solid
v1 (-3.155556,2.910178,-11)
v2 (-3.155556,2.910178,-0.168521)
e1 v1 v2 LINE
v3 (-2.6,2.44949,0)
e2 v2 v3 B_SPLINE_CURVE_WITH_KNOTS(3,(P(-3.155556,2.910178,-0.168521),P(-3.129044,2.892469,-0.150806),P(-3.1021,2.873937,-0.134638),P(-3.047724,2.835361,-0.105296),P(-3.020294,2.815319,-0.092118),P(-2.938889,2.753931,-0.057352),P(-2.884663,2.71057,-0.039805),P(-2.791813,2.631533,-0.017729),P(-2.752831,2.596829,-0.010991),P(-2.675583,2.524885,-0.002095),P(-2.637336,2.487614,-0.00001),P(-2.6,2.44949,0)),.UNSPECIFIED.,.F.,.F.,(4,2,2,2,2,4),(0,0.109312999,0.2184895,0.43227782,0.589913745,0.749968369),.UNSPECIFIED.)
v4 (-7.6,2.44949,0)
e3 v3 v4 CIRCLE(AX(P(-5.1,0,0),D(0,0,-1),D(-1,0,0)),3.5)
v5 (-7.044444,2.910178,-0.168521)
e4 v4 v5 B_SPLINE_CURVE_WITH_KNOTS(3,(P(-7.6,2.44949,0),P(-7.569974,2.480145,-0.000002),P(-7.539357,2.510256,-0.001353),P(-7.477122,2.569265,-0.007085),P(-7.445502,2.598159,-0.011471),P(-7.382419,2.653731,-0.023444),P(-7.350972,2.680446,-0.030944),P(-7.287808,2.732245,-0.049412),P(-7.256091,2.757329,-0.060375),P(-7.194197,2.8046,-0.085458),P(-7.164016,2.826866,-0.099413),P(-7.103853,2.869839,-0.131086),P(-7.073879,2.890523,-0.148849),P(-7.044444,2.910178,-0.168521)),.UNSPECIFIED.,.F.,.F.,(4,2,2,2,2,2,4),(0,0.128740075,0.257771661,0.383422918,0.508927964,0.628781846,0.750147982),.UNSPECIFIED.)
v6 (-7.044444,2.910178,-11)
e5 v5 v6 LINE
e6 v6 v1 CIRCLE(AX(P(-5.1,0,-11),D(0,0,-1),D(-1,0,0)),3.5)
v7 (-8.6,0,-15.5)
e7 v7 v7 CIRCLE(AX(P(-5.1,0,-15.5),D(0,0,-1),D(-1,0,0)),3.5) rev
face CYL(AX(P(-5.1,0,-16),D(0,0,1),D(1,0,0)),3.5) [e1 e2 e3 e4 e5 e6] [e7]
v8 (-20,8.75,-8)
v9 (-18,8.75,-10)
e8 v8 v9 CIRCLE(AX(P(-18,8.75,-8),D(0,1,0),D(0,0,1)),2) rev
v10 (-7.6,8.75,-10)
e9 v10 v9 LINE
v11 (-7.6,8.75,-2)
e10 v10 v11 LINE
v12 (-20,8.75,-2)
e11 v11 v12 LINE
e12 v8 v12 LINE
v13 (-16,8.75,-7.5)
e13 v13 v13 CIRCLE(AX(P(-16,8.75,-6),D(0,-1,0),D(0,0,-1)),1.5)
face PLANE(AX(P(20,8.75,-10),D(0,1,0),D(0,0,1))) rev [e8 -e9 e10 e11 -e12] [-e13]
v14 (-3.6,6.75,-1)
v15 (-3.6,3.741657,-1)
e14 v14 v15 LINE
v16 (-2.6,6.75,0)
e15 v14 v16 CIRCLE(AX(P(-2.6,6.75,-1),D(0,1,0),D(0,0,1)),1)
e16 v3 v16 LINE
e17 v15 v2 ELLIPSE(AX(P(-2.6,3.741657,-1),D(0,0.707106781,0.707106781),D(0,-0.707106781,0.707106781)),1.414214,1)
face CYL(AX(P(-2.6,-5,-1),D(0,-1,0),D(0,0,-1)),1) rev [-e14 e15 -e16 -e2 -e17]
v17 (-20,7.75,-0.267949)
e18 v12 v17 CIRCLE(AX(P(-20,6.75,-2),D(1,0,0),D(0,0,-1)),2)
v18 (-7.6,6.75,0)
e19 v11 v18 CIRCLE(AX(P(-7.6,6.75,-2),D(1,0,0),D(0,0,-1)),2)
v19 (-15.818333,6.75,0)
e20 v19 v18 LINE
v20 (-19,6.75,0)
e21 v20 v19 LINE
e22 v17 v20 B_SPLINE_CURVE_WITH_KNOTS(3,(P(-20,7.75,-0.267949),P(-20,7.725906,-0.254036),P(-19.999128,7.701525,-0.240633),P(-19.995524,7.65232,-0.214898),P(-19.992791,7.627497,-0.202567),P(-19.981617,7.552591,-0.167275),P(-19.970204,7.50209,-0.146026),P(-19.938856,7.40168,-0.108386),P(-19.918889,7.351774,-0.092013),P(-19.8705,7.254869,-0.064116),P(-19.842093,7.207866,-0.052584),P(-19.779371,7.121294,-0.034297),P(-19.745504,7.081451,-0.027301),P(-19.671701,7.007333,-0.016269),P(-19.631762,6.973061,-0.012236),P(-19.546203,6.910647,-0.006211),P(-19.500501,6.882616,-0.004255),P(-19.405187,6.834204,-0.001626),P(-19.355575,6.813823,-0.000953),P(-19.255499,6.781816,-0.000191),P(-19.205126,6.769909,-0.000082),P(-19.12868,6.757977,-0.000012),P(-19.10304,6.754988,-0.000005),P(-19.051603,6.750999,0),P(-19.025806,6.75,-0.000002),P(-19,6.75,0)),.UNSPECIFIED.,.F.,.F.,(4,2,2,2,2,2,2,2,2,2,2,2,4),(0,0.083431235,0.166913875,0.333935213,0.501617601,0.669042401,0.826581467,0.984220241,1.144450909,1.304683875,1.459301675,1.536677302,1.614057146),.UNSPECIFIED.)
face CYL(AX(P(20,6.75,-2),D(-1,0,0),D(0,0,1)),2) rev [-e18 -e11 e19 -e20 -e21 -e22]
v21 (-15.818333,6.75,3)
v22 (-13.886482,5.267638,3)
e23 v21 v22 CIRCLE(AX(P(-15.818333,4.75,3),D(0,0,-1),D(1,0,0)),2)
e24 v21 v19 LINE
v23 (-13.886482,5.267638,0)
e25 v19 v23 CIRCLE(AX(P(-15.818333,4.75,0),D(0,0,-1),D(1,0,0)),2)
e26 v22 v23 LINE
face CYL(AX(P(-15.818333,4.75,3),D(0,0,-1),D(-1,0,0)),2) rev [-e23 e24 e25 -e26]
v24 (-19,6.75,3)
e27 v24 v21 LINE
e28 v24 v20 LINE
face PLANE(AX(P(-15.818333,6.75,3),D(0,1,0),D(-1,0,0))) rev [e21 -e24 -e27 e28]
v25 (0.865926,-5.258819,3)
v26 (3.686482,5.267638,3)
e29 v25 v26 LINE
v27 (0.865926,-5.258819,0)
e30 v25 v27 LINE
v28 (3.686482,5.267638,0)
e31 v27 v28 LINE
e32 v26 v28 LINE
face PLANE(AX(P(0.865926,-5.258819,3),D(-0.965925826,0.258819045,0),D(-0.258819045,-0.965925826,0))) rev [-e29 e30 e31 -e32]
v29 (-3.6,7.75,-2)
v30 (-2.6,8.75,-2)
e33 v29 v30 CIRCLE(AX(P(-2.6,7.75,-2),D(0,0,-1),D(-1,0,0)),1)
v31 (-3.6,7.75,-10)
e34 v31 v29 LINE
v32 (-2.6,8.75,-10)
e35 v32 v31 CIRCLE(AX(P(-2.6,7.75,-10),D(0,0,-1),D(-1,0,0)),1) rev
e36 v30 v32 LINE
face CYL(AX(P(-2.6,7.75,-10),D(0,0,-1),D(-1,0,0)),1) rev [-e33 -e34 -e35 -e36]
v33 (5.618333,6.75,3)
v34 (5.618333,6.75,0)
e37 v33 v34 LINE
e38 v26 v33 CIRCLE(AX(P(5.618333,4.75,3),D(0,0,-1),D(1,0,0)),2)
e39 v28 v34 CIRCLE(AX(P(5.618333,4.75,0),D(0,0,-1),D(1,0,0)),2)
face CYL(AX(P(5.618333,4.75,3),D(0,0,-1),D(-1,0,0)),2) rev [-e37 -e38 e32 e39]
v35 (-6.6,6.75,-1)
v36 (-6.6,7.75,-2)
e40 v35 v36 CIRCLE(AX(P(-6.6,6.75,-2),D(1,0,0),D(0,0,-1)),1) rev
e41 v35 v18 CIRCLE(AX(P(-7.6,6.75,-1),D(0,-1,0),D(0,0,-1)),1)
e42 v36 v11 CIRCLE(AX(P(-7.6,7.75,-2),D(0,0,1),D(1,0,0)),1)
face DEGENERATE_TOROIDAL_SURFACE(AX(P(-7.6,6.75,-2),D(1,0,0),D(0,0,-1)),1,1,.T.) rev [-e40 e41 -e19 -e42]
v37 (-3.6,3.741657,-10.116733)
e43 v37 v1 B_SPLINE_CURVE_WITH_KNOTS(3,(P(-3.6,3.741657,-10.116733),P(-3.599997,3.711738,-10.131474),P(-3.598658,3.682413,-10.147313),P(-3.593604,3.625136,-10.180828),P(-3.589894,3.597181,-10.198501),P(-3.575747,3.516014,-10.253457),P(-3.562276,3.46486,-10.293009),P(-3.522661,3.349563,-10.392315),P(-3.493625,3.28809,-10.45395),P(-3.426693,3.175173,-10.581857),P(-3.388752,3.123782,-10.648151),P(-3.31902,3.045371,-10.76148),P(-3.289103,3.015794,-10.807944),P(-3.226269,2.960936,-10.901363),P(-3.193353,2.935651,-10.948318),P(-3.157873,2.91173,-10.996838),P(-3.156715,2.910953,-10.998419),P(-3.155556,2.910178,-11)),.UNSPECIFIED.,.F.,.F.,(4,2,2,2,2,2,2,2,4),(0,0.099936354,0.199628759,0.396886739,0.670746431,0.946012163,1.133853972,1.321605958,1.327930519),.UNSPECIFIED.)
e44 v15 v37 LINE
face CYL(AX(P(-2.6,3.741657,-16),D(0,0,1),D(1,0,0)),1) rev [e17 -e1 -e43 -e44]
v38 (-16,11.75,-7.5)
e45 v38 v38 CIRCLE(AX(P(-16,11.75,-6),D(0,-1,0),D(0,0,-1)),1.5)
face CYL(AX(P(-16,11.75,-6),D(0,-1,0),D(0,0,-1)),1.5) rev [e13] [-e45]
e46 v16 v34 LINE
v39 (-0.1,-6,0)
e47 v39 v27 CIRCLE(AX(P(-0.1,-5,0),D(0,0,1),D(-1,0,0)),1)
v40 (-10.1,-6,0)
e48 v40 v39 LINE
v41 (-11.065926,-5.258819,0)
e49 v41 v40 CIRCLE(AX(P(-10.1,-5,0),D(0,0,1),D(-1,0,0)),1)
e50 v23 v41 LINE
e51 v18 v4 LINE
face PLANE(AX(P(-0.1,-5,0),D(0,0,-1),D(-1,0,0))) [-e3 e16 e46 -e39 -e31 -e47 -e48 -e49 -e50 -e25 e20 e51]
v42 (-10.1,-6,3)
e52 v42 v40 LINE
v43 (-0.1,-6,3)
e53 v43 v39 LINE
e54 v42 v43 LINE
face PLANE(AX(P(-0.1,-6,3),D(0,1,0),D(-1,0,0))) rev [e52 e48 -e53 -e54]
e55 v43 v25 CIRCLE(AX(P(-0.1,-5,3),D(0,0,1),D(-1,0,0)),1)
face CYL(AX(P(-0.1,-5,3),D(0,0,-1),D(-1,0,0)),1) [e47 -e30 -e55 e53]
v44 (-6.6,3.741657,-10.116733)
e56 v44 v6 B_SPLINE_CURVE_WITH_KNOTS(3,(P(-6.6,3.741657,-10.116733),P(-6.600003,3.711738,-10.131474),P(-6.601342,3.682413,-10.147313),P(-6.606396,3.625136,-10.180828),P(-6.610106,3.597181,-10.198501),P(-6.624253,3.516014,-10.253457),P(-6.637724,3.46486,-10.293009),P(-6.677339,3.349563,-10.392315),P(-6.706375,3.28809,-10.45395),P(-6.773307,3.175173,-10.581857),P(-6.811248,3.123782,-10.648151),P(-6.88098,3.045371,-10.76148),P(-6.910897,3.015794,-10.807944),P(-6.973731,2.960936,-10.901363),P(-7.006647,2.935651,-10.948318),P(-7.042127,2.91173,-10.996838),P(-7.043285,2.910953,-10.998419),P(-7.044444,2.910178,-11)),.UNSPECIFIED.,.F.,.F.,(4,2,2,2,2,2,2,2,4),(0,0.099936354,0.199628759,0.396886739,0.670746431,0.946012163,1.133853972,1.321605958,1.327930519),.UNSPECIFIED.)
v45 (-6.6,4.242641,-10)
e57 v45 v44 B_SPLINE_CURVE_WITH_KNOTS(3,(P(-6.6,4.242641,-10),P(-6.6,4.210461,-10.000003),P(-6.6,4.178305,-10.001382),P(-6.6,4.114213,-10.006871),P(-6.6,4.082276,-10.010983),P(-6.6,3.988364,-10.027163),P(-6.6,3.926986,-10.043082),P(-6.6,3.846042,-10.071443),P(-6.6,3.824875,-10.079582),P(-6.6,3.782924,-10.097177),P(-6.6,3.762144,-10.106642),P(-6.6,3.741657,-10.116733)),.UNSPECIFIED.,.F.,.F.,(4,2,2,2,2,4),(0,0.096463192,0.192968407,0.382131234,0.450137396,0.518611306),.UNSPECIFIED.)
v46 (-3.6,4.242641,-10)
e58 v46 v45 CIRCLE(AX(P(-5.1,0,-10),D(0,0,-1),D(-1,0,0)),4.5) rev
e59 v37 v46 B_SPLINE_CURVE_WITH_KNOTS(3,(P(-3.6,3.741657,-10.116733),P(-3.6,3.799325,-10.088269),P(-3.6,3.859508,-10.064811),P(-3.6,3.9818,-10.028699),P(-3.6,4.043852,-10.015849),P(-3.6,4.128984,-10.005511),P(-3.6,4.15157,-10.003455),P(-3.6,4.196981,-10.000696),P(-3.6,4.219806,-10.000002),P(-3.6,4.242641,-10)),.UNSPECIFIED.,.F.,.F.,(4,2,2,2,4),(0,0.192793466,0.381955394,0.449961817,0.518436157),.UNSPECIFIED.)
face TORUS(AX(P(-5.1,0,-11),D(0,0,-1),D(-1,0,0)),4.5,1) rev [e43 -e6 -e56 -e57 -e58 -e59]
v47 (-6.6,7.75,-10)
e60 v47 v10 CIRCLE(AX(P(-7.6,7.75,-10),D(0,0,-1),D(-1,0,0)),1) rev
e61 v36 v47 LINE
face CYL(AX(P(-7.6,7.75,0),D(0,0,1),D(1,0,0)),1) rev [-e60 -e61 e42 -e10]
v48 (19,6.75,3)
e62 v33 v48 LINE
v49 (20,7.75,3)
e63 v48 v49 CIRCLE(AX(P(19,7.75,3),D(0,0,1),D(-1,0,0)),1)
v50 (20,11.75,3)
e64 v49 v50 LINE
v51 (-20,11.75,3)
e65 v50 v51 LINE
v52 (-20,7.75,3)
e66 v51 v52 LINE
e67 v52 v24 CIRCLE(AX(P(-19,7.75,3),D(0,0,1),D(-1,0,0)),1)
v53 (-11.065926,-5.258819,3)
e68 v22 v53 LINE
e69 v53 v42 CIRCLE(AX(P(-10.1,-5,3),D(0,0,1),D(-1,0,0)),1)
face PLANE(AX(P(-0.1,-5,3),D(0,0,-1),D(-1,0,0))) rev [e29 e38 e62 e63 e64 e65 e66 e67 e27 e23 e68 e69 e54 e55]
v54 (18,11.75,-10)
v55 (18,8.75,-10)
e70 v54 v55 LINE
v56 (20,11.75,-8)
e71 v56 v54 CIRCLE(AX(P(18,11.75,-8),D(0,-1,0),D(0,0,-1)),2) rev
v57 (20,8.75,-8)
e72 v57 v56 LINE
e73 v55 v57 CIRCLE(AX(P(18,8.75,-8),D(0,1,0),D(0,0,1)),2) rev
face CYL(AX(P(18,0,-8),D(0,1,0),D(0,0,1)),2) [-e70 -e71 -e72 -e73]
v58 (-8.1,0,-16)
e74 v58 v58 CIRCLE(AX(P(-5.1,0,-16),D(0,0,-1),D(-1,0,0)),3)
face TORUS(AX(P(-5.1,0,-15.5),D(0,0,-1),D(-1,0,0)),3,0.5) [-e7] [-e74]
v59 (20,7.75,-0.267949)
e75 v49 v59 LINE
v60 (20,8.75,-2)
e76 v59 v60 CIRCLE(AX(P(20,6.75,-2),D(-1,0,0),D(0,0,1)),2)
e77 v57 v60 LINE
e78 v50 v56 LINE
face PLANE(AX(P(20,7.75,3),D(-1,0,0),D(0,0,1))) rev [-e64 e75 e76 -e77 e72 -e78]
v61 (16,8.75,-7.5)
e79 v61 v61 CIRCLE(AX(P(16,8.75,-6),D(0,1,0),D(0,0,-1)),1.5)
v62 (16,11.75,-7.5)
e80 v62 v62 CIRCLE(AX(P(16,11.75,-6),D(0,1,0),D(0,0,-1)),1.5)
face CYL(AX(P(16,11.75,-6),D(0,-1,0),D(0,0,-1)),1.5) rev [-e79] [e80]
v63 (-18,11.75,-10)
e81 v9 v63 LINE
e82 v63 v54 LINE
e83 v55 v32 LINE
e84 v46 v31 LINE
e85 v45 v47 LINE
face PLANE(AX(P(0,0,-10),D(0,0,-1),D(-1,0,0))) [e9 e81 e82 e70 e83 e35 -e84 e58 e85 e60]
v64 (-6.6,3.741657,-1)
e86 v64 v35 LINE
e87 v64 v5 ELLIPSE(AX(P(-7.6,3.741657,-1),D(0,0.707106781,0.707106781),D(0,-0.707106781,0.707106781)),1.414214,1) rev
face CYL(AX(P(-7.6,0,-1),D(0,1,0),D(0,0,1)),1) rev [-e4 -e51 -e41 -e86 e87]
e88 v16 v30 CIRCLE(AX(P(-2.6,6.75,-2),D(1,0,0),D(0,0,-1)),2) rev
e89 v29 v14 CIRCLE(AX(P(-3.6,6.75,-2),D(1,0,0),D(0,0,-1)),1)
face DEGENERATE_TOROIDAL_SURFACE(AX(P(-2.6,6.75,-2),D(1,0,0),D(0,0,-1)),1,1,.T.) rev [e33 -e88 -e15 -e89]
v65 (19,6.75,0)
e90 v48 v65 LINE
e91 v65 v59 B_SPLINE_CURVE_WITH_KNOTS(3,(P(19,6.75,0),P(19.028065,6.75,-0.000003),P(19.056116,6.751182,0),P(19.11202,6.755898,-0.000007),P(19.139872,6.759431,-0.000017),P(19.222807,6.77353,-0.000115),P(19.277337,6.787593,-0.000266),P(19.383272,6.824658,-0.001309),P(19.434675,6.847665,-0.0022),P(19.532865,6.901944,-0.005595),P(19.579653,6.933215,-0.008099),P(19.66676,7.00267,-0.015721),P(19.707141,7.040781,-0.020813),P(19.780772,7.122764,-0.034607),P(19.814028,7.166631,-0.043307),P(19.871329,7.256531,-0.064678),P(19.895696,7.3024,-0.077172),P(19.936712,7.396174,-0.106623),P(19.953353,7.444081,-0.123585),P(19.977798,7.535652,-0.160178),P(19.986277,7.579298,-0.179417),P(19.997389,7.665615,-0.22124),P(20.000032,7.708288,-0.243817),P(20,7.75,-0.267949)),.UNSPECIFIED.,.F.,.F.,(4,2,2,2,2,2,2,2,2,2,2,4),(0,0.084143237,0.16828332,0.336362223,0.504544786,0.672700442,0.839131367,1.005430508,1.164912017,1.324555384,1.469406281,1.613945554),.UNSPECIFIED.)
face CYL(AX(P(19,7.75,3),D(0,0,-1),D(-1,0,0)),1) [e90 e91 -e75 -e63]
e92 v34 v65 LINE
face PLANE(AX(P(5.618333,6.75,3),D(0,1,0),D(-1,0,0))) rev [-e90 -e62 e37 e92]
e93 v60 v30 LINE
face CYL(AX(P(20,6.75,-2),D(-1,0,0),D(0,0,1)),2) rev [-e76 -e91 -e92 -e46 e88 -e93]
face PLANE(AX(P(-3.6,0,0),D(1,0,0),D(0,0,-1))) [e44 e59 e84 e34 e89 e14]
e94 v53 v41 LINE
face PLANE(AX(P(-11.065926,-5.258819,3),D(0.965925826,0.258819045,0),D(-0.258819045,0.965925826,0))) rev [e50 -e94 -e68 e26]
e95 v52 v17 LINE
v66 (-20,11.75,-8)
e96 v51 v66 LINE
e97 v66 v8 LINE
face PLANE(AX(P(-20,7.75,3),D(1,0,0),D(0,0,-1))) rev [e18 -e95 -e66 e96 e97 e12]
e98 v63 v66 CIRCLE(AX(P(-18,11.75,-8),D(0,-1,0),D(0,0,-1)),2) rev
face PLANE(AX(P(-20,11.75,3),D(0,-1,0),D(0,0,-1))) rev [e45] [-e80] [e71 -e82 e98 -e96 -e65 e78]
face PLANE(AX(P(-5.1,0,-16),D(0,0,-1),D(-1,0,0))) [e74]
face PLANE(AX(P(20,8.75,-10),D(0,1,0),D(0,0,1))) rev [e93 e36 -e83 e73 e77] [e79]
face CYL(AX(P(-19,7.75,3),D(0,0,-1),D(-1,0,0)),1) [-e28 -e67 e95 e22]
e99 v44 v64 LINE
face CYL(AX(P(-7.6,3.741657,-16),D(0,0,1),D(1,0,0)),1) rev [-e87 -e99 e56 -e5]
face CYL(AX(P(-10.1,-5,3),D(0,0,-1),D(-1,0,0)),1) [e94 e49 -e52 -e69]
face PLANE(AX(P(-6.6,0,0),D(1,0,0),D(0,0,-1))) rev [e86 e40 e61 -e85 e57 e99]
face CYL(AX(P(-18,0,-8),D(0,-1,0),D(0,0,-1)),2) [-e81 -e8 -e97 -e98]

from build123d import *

# Parameters (mm, degrees)
BOSS_EXTRUDE1_DEPTH = 3
SKETCH4_W           = 40
SKETCH4_H           = 3
BOSS_EXTRUDE2_DEPTH = 10
FILLET1_R           = 2
FILLET2_R           = 2
SKETCH5_R           = 1.5
CUT_EXTRUDE1_DEPTH  = 27.787357167
SKETCH6_R           = 3.5
BOSS_EXTRUDE3_DEPTH = 16
FILLET3_R           = 0.5
SKETCH7_W           = 10
SKETCH7_H           = 8.75
BOSS_EXTRUDE4_DEPTH = 1.5
FILLET4_R           = 1


with BuildPart() as part:
    # Sketch3 → Boss-Extrude1 (new body)
    with BuildSketch(Plane.XY):
        with BuildLine():
            Line((-0.1, -6), (-10.1, -6))
            ThreePointArc((-10.1, -6), (-10.708761429, -5.79335334), (-11.065925826, -5.258819045))
            Line((-11.065925826, -5.258819045), (-13.886481515, 5.26763809))
            ThreePointArc((-13.886481515, 5.26763809), (-14.600810309, 6.336706681), (-15.818333167, 6.75))
            Line((-15.818333167, 6.75), (-19, 6.75))
            ThreePointArc((-19, 6.75), (-19.707106781, 7.042893219), (-20, 7.75))
            Line((-20, 7.75), (-20, 11.75))
            Line((-20, 11.75), (20, 11.75))
            Line((20, 11.75), (20, 7.75))
            ThreePointArc((20, 7.75), (19.707106781, 7.042893219), (19, 6.75))
            Line((19, 6.75), (5.618333167, 6.75))
            ThreePointArc((5.618333167, 6.75), (4.400810309, 6.336706681), (3.686481515, 5.26763809))
            Line((3.686481515, 5.26763809), (0.865925826, -5.258819045))
            ThreePointArc((0.865925826, -5.258819045), (0.508761429, -5.79335334), (-0.1, -6))
        make_face()
    extrude(amount=BOSS_EXTRUDE1_DEPTH)

    # Sketch4 → Boss-Extrude2 (add)
    with BuildSketch(Plane(origin=(0, 0, 0), x_dir=(-1, 0, 0), z_dir=(0, 0, -1))):
        with Locations((0, 10.25)):
            Rectangle(SKETCH4_W, SKETCH4_H)
    extrude(amount=BOSS_EXTRUDE2_DEPTH)

    # Fillet1
    fillet1_edges = [part.edges().sort_by_distance(p)[0] for p in [
        (0, 8.75, 0),
    ]]
    fillet(fillet1_edges, radius=FILLET1_R - 0.0001)  # a hair under: the kernel refuses the full size

    # Fillet2
    fillet2_edges = [part.edges().sort_by_distance(p)[0] for p in [
        (20, 10.25, -10),
        (-20, 10.25, -10),
    ]]
    fillet(fillet2_edges, radius=FILLET2_R)

    # Sketch5 → Cut-Extrude1 (cut, through all)
    with BuildSketch(Plane.XZ.offset(-8.75)):
        with Locations(Location((-16, -6, 0), (0, 0, 270))):
            Circle(SKETCH5_R)
    cut_extrude1 = extrude(amount=-CUT_EXTRUDE1_DEPTH, mode=Mode.SUBTRACT)

    # Mirror1: Cut-Extrude1 across plane
    add(cut_extrude1.mirror(Plane(origin=(0, 0, 0), x_dir=(0, 0, 1), z_dir=(1, 0, 0))), mode=Mode.SUBTRACT)

    # Sketch6 → Boss-Extrude3 (add)
    with BuildSketch(Plane(origin=(0, 0, 0), x_dir=(-1, 0, 0), z_dir=(0, 0, -1))):
        with Locations((5.1, 0)):
            Circle(SKETCH6_R)
    extrude(amount=BOSS_EXTRUDE3_DEPTH)

    # Fillet3
    fillet3_edges = [part.edges().sort_by_distance(p)[0] for p in [
        (-1.6, 0, -16),
    ]]
    fillet(fillet3_edges, radius=FILLET3_R)

    # Sketch7 → Boss-Extrude4 (add, symmetric)
    with BuildSketch(Plane(origin=(-5.1, 0, 0), x_dir=(0, 0, -1), z_dir=(1, 0, 0))):
        with Locations((5, 4.375)):
            Rectangle(SKETCH7_W, SKETCH7_H)
    extrude(amount=BOSS_EXTRUDE4_DEPTH, both=True)

    # Fillet4
    fillet4_edges = [part.edges().sort_by_distance(p)[0] for p in [
        (-3.6, 8.164242852, -0.585757148),
        (-6.6, 4.95618883, 0),
        (-6.6, 8.164242852, -0.585757148),
        (-6.6, 8.75, -5.99995),
        (-3.6, 8.75, -5.99995),
        (-3.6, 4.95618883, 0),
        (-6.6, 3.16227766, -5),
        (-5.1, 3.5, -10),
        (-3.6, 3.16227766, -5),
    ]]
    fillet(fillet4_edges, radius=FILLET4_R)


solid = part.part
